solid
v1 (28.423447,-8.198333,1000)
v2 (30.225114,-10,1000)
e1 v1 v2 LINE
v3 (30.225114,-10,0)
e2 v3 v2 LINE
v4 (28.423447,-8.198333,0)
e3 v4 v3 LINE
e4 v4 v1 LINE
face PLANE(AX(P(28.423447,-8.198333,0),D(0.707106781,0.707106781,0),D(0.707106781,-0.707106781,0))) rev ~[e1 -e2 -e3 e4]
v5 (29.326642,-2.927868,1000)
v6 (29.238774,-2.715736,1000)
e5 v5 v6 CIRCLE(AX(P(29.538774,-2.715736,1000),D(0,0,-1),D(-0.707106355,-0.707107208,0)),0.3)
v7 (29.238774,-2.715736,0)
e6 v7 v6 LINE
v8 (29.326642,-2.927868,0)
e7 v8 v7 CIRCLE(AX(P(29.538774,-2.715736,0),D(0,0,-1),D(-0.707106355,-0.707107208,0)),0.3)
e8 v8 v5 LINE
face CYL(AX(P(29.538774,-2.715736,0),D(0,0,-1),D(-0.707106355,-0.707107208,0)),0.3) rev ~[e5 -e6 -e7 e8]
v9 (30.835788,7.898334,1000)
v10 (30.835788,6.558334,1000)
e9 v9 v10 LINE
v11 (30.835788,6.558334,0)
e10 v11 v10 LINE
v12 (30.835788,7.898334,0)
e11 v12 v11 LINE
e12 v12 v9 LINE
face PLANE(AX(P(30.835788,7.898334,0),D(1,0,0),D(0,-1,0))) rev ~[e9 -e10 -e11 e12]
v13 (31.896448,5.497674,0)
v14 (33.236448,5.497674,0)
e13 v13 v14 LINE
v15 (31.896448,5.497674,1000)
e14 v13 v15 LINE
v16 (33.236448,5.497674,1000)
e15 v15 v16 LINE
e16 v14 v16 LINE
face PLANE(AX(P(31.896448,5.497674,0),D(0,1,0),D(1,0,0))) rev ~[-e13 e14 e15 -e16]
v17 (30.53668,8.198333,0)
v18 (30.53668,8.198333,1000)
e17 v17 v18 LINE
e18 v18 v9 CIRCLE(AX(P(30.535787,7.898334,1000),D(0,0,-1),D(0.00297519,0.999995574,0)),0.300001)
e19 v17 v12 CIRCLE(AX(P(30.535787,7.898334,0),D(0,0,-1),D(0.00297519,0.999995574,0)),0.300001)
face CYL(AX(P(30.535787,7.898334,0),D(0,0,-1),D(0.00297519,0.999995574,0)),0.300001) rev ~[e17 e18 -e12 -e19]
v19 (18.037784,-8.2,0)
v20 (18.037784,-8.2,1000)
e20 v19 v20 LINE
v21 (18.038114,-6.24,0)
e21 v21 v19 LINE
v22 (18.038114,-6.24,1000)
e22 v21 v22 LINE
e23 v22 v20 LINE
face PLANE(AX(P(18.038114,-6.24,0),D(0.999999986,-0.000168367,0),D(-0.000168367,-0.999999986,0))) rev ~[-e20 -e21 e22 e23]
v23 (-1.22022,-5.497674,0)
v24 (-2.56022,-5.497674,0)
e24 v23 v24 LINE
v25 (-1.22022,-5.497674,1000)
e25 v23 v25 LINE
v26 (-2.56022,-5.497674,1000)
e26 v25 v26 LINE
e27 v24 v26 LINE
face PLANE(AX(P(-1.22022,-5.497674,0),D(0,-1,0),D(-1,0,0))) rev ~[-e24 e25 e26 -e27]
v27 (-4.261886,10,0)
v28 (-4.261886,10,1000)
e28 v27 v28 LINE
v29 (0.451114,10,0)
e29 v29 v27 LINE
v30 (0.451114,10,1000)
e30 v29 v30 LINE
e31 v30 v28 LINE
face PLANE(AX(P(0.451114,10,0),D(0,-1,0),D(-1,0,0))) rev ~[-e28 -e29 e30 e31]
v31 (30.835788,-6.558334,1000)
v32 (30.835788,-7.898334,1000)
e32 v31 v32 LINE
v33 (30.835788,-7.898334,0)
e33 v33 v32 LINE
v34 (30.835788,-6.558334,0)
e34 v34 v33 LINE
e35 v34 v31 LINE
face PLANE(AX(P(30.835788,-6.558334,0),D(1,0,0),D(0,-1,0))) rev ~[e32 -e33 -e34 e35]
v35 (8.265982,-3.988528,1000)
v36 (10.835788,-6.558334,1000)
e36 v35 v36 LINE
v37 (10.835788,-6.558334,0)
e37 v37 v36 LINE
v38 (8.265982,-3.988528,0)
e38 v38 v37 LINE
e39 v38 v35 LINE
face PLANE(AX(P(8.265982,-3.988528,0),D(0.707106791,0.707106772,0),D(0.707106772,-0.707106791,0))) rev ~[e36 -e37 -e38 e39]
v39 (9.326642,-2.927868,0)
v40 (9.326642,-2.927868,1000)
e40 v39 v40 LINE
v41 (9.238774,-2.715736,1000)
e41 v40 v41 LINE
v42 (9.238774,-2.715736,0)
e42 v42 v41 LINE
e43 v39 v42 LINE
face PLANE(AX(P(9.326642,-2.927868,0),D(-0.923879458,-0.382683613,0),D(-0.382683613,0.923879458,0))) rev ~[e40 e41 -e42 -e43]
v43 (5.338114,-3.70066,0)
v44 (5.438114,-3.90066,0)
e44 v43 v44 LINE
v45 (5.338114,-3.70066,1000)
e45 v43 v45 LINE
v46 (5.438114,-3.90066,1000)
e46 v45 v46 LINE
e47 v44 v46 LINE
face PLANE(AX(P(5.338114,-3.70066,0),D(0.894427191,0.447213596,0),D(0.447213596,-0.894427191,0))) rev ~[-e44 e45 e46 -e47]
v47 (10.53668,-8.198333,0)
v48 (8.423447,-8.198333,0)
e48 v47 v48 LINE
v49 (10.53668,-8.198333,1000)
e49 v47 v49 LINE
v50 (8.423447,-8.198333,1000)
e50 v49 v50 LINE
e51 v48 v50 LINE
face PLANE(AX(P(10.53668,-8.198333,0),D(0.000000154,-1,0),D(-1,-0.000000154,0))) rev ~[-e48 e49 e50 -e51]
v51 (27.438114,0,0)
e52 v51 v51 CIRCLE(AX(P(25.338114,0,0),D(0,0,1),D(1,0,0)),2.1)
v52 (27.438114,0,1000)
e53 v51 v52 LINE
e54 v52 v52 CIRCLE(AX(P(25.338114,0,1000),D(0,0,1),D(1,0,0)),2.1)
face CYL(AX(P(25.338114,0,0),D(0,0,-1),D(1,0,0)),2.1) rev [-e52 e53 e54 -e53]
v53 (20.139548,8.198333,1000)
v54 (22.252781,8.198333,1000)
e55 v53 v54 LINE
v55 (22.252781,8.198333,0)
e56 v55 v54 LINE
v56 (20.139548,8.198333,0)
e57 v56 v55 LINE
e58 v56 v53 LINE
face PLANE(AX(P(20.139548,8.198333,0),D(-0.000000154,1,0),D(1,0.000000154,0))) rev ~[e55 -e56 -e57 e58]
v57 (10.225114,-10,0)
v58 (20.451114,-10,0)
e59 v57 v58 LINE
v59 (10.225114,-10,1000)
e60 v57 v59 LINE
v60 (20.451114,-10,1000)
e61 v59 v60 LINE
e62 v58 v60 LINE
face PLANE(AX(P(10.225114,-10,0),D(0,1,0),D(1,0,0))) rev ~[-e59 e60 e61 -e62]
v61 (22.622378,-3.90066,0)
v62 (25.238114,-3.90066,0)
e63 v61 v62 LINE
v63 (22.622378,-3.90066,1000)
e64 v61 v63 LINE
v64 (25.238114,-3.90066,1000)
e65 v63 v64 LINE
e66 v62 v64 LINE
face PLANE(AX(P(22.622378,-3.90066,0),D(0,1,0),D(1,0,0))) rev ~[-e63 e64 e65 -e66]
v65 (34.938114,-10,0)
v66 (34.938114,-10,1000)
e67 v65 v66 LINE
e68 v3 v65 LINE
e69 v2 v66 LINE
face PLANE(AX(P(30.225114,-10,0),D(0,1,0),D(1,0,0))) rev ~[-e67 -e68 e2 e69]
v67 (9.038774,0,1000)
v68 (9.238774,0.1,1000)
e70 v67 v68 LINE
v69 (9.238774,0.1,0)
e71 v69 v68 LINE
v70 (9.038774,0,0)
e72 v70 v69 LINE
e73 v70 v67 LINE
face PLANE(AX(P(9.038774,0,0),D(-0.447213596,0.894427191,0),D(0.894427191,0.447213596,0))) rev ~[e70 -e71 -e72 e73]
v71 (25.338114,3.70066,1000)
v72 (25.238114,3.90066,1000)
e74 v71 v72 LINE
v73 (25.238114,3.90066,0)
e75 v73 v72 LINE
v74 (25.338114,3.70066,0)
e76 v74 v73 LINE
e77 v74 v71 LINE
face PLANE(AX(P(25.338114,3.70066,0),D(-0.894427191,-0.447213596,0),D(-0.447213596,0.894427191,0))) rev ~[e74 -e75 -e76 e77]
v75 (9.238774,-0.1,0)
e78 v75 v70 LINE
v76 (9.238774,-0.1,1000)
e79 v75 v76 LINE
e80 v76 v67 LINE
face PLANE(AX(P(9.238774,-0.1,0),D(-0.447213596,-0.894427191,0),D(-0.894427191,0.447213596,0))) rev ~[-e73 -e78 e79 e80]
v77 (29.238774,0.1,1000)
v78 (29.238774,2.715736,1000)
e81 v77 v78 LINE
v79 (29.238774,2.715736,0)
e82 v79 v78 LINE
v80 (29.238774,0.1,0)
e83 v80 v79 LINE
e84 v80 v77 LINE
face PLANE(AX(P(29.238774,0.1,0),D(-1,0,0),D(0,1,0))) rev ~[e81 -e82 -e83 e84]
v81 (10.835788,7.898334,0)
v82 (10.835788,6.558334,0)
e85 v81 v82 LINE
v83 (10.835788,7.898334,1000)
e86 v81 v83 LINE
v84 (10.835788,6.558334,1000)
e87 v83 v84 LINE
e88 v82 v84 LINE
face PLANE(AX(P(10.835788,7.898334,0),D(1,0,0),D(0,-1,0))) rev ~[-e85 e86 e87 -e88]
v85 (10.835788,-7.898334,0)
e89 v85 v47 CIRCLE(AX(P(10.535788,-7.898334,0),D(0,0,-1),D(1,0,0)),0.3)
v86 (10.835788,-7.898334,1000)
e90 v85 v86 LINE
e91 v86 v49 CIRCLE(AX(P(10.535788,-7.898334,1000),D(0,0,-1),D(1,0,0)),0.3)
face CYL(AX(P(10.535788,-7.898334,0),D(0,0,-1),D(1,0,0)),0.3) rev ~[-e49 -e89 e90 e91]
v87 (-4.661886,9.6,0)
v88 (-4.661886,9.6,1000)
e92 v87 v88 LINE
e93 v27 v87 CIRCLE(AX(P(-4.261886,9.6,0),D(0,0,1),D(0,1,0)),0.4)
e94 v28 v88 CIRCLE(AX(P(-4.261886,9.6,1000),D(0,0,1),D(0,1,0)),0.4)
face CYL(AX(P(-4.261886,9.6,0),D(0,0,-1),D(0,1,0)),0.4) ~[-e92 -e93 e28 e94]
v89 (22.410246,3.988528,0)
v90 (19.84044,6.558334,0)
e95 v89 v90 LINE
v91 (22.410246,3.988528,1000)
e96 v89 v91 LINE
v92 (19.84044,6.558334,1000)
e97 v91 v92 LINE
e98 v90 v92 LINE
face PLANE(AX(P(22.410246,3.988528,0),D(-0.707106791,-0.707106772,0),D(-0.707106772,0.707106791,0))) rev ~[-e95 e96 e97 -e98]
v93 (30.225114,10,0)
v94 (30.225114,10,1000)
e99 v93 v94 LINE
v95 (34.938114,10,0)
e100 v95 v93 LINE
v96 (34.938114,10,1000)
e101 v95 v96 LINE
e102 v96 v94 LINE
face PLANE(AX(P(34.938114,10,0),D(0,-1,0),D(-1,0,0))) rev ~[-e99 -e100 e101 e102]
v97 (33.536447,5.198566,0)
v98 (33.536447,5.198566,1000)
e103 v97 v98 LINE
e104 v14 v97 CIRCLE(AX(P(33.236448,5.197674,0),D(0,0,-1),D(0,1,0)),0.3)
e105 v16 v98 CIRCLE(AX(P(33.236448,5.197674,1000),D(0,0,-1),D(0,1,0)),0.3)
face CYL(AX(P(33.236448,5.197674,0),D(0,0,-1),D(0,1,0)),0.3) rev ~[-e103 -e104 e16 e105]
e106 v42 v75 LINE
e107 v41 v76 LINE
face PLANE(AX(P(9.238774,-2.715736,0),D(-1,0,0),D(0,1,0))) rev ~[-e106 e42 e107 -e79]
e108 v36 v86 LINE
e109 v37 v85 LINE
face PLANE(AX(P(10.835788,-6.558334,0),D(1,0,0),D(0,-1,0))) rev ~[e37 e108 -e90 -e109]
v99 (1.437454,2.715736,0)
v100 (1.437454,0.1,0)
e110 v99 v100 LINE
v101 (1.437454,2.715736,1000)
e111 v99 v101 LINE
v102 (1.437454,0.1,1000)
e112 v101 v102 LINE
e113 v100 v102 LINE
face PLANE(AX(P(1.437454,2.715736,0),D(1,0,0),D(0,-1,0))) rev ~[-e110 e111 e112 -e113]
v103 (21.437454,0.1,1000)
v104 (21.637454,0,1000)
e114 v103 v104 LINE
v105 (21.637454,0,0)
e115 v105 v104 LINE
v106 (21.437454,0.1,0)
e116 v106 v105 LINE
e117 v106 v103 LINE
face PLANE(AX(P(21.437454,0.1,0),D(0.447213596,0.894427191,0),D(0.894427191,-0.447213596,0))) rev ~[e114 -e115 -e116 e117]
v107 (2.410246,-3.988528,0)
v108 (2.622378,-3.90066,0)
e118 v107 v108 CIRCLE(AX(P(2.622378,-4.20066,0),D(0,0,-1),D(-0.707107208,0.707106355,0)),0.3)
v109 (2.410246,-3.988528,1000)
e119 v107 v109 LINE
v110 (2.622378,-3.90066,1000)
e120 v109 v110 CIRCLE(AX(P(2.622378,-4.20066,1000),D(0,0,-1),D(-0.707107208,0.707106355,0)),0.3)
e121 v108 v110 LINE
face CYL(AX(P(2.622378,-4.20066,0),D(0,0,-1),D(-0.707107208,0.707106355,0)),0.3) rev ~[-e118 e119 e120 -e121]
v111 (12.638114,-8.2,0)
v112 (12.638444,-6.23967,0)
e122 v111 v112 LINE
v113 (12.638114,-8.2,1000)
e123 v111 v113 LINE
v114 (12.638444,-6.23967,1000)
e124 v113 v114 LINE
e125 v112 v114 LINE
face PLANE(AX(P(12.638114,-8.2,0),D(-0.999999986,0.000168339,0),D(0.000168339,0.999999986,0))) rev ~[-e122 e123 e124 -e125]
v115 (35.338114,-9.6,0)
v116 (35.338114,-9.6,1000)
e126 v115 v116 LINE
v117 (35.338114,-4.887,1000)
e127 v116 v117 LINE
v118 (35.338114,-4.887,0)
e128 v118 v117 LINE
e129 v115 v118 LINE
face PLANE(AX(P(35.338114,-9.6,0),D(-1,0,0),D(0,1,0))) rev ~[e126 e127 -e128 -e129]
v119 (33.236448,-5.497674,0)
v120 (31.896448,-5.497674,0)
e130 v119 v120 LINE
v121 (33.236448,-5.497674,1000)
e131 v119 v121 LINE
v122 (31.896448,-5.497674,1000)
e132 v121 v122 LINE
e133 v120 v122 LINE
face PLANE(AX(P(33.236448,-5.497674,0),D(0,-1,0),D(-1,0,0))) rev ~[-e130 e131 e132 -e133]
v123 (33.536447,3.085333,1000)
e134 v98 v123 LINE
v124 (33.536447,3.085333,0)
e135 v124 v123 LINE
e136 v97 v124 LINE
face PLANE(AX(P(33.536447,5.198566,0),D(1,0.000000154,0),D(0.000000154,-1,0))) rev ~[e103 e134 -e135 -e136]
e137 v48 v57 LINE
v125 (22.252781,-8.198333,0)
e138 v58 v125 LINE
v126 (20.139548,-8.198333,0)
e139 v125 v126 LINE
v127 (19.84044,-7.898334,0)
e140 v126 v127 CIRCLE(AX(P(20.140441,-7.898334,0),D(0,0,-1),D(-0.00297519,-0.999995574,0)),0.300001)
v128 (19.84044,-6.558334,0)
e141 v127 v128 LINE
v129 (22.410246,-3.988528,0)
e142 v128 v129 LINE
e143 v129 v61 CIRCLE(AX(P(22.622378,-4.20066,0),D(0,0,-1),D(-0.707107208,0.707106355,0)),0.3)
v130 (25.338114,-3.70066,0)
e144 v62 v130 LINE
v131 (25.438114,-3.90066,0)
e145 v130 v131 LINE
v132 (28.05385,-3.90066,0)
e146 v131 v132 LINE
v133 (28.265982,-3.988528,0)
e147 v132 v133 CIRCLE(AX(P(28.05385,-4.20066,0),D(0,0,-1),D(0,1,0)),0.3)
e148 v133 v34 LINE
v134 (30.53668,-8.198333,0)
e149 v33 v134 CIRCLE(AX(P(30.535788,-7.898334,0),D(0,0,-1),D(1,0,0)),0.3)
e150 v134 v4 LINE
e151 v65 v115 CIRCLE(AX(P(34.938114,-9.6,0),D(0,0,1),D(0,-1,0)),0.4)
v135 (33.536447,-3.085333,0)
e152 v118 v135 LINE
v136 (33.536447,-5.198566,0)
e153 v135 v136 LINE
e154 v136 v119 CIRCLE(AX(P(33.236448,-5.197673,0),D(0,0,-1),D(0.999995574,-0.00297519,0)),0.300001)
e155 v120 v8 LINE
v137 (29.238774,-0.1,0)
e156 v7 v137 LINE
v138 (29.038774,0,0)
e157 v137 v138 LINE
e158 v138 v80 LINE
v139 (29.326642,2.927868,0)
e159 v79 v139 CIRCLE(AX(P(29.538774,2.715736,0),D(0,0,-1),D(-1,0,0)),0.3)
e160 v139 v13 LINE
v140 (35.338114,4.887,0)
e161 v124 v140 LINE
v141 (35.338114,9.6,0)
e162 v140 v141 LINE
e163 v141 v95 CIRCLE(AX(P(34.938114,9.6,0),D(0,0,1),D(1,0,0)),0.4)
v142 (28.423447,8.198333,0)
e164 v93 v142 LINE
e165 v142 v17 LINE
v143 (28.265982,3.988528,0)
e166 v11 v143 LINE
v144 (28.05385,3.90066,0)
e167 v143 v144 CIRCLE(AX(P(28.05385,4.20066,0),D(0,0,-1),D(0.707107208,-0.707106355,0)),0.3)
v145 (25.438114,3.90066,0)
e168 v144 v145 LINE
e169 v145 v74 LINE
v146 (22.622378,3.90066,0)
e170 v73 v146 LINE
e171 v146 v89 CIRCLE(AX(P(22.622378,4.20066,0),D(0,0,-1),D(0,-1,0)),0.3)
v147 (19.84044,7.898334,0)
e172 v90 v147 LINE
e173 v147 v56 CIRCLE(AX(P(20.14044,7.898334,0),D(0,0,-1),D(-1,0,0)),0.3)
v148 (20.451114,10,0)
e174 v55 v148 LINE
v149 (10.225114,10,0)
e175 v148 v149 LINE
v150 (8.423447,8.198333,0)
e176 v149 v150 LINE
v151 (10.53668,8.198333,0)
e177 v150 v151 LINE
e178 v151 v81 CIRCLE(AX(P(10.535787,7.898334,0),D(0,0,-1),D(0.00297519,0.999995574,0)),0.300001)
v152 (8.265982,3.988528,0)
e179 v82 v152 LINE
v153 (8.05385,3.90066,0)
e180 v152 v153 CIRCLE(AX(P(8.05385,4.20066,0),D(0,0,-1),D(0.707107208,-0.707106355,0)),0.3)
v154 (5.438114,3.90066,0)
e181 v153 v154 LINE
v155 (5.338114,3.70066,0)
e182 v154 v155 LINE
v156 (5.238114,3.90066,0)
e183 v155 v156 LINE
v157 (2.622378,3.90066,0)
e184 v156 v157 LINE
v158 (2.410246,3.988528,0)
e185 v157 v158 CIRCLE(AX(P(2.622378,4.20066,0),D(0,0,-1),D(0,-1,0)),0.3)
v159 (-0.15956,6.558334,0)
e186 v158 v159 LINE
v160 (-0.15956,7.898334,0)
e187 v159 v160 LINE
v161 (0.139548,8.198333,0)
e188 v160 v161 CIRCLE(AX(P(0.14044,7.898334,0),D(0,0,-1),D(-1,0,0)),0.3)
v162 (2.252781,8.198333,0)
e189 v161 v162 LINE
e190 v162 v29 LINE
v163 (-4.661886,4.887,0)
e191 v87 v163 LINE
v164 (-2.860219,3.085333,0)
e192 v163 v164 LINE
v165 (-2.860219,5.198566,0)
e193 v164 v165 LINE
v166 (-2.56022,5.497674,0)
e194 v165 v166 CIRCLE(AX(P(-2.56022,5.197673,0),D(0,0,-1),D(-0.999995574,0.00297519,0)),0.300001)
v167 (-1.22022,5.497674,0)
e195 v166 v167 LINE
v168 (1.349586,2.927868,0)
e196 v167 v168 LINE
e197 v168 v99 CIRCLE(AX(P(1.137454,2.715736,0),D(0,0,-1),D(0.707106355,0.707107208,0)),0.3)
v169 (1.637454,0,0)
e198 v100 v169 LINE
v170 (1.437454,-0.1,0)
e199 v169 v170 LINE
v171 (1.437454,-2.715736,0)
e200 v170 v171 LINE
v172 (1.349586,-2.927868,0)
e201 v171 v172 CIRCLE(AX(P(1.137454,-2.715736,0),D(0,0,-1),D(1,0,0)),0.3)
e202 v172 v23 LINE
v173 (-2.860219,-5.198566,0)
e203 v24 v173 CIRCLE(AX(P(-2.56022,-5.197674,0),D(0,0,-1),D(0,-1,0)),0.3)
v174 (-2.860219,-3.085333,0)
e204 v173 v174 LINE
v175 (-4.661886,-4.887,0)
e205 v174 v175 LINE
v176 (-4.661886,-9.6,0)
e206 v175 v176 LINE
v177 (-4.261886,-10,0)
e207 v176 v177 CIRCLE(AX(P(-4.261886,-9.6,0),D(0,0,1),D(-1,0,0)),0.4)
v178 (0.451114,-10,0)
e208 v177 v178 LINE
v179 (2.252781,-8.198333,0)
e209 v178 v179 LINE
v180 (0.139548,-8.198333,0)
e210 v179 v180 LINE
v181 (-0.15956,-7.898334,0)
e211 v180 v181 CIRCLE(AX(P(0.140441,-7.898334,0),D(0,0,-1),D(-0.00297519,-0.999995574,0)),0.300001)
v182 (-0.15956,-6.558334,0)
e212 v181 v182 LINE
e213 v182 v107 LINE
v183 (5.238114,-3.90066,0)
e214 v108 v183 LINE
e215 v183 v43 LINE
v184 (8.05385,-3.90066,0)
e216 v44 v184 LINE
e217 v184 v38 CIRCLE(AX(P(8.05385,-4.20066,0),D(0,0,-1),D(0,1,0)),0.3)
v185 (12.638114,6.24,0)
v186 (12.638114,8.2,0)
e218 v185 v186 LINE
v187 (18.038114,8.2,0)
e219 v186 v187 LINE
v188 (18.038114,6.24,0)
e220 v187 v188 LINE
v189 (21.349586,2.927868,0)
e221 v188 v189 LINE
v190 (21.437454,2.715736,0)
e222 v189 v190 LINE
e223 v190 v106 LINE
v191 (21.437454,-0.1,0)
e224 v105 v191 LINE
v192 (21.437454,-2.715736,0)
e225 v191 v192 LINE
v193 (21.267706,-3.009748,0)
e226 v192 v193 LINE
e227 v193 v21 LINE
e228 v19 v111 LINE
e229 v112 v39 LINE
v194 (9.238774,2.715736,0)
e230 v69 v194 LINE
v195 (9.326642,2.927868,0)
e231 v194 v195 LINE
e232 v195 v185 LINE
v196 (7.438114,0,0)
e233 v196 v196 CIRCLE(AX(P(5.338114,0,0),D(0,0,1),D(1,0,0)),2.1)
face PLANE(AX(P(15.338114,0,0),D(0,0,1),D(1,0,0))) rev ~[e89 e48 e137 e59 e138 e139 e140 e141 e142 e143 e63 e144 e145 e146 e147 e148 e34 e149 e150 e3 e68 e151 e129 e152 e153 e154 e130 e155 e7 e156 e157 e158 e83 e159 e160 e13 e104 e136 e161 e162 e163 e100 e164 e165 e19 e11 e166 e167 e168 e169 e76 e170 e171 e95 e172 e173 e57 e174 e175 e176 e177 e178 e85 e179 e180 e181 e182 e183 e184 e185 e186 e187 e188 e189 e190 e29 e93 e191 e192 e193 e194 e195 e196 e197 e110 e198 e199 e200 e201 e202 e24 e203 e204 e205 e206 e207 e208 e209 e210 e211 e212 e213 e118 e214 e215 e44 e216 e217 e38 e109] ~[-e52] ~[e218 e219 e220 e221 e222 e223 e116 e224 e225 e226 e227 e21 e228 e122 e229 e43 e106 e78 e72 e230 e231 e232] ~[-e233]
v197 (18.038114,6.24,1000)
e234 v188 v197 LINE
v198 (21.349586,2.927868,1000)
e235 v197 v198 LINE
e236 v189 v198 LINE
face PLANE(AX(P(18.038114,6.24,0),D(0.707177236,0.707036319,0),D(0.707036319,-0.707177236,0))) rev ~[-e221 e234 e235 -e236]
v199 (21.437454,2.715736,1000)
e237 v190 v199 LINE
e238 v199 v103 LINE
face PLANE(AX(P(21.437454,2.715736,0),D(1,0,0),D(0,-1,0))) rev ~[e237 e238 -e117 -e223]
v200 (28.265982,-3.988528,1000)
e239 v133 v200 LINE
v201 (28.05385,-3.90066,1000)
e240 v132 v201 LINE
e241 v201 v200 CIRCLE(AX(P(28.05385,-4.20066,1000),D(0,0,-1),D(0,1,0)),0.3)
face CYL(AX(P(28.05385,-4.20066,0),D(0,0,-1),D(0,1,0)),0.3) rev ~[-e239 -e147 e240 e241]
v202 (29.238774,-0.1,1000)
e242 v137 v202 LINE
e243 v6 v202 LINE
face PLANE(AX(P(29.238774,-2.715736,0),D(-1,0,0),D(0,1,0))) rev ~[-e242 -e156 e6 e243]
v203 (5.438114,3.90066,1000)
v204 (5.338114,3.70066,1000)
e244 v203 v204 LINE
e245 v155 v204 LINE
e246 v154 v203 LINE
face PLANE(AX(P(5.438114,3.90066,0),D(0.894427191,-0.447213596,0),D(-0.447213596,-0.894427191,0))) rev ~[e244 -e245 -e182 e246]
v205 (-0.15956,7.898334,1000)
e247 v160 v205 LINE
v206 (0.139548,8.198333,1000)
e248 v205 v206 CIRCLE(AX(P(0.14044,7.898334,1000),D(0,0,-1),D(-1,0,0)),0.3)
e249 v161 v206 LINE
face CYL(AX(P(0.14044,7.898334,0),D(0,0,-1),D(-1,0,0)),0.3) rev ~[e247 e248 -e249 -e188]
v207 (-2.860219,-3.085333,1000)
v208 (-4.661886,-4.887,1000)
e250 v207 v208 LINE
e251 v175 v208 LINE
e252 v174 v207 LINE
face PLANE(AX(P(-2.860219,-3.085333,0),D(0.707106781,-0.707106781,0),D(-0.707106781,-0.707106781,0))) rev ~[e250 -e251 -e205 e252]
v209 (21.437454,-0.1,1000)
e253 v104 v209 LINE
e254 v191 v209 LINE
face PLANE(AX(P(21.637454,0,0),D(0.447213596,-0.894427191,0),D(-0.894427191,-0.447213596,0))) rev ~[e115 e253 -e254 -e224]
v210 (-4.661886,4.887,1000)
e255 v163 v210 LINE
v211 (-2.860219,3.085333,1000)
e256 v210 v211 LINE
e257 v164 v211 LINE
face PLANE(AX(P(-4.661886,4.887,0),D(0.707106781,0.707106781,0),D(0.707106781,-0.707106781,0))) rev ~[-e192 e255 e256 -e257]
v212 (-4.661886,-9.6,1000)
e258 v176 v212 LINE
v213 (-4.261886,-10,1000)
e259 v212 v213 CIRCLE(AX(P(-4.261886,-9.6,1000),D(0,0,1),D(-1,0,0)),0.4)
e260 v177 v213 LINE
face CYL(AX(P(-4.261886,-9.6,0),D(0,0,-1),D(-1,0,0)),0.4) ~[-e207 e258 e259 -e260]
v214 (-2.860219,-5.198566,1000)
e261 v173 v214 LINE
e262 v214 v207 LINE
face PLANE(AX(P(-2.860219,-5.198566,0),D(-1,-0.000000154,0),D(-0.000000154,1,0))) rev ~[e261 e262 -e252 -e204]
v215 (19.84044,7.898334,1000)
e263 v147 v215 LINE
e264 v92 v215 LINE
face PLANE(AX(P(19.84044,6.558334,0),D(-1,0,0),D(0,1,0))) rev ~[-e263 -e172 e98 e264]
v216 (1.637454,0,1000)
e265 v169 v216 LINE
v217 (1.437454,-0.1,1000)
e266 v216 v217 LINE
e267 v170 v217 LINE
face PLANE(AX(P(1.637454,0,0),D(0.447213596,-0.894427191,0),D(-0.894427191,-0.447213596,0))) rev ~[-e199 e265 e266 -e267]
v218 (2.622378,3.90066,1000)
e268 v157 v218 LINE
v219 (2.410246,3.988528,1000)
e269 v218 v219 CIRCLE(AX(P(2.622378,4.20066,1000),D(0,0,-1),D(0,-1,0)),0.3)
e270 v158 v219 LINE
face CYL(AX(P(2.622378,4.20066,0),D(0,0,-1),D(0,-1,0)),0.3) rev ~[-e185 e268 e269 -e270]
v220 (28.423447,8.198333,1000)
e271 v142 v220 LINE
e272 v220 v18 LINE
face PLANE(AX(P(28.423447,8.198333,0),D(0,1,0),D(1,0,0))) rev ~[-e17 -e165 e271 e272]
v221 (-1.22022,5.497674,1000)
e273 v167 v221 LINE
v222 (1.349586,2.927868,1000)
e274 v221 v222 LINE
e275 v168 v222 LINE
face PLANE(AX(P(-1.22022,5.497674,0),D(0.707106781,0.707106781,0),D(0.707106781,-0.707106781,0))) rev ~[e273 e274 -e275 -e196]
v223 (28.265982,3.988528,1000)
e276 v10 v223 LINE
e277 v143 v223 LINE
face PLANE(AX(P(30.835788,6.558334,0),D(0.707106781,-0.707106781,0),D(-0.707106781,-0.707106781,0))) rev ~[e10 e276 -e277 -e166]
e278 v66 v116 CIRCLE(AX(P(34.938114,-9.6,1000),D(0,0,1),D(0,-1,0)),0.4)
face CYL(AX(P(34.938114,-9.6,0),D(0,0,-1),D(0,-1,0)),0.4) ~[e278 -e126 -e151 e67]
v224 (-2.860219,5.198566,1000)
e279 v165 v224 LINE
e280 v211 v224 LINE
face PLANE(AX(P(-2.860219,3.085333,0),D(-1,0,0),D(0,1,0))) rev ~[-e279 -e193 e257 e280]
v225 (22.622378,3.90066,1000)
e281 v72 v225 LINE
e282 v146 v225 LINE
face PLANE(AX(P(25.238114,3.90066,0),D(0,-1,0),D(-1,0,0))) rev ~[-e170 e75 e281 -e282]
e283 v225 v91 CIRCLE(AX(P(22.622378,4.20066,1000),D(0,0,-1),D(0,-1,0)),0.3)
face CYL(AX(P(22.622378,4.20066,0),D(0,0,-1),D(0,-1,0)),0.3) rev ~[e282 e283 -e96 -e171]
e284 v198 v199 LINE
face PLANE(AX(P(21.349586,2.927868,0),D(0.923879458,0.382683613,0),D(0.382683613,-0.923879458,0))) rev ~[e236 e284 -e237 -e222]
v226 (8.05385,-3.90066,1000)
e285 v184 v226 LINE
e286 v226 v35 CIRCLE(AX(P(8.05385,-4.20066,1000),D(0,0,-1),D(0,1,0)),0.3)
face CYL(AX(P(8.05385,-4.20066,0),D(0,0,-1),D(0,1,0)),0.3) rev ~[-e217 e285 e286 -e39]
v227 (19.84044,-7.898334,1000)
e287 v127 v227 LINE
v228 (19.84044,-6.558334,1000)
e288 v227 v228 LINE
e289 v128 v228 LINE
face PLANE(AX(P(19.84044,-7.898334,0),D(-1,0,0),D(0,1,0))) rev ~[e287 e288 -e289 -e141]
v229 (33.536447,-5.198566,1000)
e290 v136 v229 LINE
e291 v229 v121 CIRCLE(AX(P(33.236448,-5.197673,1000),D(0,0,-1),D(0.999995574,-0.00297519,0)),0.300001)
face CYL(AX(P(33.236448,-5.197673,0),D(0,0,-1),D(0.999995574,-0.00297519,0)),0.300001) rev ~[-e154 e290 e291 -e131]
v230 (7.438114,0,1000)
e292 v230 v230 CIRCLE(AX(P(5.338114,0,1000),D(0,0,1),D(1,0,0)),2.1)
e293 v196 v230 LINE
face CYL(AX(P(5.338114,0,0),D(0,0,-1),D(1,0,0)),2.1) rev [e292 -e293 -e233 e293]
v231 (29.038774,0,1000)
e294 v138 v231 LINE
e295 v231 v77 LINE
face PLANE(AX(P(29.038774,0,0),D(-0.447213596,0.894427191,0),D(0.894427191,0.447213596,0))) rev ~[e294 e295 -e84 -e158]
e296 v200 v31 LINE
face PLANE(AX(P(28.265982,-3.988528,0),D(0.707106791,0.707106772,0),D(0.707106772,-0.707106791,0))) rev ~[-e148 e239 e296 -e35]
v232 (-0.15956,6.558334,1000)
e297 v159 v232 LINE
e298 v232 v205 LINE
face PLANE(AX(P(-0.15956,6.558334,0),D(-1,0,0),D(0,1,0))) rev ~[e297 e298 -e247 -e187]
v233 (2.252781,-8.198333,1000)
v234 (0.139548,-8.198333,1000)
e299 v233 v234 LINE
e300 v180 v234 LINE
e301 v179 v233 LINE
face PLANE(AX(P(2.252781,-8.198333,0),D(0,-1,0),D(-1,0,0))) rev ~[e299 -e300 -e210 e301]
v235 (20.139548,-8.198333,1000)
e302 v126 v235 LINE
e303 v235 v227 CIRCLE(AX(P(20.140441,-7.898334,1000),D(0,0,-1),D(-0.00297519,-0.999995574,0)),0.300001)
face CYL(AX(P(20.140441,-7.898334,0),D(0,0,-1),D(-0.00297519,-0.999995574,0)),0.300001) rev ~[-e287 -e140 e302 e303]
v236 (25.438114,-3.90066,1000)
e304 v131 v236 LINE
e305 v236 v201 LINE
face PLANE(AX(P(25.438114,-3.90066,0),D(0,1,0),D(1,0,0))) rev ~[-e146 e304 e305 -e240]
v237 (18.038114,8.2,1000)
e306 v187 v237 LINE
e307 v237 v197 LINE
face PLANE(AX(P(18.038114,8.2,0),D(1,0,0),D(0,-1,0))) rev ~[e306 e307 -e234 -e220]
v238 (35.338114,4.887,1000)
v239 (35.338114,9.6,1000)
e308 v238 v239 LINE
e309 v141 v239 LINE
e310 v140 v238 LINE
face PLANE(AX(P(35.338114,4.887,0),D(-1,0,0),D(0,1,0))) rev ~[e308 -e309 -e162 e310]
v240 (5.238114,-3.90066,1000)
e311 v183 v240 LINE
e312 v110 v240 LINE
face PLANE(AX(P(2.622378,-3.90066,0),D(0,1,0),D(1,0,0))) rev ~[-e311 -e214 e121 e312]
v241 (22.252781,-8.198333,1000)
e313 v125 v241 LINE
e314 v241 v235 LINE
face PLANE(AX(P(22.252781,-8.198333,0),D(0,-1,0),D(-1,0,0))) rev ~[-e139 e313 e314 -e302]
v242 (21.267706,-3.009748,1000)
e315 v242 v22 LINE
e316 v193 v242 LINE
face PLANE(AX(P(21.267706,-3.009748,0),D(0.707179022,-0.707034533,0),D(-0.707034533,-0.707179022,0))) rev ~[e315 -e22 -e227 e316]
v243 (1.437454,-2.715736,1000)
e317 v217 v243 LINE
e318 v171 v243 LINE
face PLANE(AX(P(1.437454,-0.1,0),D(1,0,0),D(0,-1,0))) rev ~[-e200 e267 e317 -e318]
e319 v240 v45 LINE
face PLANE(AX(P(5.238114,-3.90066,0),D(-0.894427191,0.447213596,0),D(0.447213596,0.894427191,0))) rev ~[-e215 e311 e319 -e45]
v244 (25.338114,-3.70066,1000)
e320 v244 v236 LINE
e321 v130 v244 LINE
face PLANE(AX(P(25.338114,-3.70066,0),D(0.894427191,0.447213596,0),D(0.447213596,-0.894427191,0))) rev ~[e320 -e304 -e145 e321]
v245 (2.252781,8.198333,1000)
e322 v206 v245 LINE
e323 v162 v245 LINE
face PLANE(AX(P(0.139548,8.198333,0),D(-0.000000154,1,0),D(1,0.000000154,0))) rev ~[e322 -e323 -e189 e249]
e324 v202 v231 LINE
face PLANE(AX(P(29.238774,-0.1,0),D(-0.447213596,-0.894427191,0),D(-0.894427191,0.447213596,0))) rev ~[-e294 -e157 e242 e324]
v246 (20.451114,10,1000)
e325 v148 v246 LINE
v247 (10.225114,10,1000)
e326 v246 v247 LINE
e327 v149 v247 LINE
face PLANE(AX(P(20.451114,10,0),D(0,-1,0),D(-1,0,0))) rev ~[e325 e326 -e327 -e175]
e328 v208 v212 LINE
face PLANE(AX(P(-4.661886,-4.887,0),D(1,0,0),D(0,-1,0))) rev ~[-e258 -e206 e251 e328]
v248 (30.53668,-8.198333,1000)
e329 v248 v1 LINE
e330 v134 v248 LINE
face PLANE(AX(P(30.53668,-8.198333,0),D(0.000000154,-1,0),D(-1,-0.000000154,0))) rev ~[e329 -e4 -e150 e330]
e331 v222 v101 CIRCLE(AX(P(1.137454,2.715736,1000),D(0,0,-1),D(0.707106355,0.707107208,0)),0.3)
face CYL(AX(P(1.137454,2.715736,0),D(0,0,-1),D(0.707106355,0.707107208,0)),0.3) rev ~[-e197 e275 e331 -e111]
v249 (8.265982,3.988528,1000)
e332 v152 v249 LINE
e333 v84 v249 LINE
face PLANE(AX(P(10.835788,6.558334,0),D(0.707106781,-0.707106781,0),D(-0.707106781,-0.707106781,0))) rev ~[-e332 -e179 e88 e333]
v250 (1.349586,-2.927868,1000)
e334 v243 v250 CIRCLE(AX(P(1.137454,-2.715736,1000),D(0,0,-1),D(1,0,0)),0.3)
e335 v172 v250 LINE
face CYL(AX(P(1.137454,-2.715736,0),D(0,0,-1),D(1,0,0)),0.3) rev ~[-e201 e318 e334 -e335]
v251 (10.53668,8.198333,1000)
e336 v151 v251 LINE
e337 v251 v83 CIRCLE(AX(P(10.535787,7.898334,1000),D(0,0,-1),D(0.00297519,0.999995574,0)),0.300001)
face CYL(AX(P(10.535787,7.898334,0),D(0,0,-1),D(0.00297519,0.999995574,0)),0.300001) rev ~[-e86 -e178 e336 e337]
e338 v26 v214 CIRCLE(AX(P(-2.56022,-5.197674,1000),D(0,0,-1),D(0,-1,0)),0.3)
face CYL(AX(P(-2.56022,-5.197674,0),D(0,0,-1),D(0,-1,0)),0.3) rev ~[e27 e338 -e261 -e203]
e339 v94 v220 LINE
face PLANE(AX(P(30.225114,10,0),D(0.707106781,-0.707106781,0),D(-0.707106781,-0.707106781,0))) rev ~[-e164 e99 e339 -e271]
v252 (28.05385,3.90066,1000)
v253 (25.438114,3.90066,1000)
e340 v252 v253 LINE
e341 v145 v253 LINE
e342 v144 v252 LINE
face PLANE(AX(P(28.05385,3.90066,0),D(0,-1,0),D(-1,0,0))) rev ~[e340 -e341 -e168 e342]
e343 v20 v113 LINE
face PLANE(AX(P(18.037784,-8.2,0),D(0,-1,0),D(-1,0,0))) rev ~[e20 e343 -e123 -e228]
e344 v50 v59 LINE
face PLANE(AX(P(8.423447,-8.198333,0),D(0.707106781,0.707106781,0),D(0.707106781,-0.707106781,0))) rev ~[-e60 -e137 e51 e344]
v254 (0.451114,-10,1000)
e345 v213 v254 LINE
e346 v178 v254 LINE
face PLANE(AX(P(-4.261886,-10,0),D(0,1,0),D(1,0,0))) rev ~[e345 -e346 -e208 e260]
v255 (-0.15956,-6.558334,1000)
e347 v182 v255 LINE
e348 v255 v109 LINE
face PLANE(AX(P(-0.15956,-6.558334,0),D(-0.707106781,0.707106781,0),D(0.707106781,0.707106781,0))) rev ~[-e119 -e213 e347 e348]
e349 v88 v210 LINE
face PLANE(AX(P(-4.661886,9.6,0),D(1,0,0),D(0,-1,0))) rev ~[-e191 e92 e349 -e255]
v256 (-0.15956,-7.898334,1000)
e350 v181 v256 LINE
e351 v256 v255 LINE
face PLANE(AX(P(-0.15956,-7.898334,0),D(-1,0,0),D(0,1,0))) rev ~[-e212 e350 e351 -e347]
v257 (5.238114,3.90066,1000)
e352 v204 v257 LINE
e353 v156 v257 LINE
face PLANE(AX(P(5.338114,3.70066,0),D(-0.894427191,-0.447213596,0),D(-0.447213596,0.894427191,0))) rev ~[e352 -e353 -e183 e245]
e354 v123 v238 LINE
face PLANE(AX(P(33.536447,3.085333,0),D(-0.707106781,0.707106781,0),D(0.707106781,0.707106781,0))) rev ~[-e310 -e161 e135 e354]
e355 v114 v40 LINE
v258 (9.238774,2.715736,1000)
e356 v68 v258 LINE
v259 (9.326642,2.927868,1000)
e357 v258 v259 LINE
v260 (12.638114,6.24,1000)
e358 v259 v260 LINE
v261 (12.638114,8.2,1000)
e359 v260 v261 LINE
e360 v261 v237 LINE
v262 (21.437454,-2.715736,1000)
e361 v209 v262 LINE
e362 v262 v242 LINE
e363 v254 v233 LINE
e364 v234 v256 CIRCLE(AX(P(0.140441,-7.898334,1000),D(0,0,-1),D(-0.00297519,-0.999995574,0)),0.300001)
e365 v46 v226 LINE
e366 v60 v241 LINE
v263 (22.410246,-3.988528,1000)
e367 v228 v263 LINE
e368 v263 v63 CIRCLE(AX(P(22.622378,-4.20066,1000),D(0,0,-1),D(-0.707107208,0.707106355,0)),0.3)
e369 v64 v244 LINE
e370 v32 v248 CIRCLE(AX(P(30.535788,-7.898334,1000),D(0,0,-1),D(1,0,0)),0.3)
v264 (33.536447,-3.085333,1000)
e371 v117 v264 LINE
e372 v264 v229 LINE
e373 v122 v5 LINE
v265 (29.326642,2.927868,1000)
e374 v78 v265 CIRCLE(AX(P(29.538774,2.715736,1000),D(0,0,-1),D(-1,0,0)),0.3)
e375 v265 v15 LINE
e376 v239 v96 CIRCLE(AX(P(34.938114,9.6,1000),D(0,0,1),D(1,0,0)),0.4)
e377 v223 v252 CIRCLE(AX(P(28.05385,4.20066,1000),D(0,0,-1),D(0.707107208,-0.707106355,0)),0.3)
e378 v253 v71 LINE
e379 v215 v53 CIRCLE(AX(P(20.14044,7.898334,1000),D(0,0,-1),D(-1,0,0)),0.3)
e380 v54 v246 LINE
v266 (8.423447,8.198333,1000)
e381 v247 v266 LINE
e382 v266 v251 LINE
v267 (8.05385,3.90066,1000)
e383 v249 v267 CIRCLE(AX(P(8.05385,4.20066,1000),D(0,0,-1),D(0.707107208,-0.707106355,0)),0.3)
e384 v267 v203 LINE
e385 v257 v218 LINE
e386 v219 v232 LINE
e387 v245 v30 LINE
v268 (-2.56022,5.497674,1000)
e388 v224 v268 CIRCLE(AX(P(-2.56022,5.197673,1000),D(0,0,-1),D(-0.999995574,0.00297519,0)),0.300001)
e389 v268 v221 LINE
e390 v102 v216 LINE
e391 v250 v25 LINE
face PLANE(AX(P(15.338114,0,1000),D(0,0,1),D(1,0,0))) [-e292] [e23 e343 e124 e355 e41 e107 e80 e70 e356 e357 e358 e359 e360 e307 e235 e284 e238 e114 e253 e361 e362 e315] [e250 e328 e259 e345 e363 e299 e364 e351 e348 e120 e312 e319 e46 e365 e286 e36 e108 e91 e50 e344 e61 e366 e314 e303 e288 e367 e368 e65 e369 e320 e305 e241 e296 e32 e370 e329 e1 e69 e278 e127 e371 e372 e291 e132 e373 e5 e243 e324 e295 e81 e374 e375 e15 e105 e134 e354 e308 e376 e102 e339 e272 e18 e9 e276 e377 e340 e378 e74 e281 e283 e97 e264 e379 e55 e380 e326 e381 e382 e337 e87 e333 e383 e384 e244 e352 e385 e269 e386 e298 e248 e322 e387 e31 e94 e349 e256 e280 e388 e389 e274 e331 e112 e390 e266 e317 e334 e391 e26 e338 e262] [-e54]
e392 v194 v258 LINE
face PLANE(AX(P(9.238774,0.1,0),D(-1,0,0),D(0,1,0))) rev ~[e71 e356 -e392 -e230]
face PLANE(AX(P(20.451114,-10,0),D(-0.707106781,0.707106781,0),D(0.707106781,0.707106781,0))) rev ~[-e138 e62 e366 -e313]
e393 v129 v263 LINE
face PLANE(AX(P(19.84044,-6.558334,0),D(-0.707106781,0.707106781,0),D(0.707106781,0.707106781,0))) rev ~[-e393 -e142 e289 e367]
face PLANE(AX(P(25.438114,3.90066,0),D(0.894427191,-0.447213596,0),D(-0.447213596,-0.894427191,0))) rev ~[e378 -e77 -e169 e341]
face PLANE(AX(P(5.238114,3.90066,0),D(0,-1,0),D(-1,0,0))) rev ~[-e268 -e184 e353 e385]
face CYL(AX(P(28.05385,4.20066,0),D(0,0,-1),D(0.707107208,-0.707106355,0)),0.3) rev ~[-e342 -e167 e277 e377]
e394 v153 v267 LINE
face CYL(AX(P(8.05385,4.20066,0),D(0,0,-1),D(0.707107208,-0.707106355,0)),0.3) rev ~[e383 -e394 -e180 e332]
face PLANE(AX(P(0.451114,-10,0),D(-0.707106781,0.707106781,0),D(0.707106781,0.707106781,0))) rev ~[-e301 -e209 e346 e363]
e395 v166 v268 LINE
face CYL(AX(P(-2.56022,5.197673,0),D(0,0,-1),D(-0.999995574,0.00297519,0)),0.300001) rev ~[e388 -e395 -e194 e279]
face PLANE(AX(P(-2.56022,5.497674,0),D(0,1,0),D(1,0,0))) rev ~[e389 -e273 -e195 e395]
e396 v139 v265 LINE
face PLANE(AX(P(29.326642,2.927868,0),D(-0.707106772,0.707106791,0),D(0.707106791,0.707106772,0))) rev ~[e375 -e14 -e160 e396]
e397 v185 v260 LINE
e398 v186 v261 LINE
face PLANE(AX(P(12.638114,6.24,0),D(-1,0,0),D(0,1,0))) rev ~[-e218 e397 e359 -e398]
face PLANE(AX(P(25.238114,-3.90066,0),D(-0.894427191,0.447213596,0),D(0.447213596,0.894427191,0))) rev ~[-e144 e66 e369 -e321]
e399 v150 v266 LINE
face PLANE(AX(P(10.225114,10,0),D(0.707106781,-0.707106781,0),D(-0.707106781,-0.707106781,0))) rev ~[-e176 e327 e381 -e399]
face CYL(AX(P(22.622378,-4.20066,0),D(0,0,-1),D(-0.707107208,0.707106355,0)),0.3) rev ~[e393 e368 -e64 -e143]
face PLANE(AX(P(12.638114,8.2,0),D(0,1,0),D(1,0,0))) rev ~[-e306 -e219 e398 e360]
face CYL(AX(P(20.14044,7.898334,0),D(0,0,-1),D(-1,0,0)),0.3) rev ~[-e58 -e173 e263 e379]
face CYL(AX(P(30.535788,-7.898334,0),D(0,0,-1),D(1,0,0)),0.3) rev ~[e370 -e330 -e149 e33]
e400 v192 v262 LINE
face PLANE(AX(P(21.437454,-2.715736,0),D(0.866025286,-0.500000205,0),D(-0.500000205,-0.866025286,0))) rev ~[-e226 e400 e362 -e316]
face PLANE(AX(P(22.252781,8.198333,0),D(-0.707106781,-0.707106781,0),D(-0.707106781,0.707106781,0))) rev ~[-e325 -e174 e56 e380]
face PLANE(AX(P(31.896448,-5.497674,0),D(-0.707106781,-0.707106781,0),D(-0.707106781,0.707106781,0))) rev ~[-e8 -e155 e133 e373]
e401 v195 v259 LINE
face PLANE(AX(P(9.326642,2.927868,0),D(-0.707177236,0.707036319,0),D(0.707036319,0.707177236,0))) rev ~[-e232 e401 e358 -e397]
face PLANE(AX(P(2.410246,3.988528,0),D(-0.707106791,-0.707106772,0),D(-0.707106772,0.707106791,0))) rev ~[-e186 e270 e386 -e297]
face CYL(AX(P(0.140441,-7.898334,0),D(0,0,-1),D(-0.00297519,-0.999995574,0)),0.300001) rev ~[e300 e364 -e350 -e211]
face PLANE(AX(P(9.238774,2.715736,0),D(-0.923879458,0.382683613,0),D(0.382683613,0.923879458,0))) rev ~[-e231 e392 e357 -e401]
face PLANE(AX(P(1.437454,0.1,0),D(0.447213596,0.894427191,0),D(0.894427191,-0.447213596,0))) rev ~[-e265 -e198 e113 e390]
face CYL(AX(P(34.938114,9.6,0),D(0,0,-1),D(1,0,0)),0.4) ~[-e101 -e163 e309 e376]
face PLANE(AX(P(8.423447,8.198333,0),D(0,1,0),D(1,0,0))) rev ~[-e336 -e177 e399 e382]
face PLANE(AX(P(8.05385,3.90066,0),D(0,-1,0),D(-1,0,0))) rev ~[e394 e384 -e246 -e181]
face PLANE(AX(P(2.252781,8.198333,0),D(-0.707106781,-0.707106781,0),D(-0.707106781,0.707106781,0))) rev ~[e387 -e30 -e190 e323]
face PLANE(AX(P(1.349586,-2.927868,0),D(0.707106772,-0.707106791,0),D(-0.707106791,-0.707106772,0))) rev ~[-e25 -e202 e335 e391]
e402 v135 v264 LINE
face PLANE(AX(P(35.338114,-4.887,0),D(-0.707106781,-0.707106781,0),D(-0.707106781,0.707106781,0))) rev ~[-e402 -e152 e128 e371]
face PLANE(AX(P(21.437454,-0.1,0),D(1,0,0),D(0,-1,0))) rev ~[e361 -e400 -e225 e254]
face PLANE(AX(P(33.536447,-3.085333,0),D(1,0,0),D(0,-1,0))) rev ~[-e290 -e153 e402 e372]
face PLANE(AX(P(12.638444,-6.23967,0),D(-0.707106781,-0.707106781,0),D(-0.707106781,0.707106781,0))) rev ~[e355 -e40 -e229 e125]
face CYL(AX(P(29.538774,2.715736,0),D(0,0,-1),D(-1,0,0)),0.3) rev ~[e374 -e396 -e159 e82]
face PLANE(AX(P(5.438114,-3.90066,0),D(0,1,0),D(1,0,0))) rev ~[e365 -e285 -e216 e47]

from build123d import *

# Parameters (mm, degrees)
F0_R     = 2.1
F1_DEPTH = 1000


# Not quite as in the source:
# - ends of sketch curves that miss each other by under 0.0002 mm in the source are joined


with BuildPart() as f1:
    # F0 (on Top) → F1 (new body)
    with BuildSketch(Plane.XY):
        with BuildLine():
            Line((-2.860219, 3.085333), (-2.860219, 5.198566))
            ThreePointArc((-2.860219, 5.198566), (-2.7720364303, 5.4101211696), (-2.56022, 5.497674))
            Line((-2.56022, 5.497674), (-1.22022, 5.497674))
            Line((-1.22022, 5.497674), (1.349586, 2.927868))
            ThreePointArc((1.349586, 2.927868), (1.4146178598, 2.8305410297), (1.437454, 2.715736))
            Line((1.437454, 2.715736), (1.437454, 0.1))
            Line((1.437454, 0.1), (1.637454, 0))
            Line((1.637454, 0), (1.437454, -0.1))
            Line((1.437454, -0.1), (1.437454, -2.715736))
            ThreePointArc((1.437454, -2.715736), (1.4146178598, -2.8305410297), (1.3495860344, -2.9278680344))
            Line((1.3495860344, -2.9278680344), (-1.22022, -5.497674))
            Line((-1.22022, -5.497674), (-2.56022, -5.497674))
            ThreePointArc((-2.56022, -5.497674), (-2.7720364303, -5.4101211696), (-2.8602186739, -5.198565999))
            Line((-2.8602186739, -5.198565999), (-2.860219, -3.085333))
            Line((-2.860219, -3.085333), (-4.661886, -4.887))
            Line((-4.661886, -4.887), (-4.661886, -9.6))
            ThreePointArc((-4.661886, -9.6), (-4.5447287125, -9.8828427125), (-4.261886, -10))
            Line((-4.261886, -10), (0.451114, -10))
            Line((0.451114, -10), (2.252781, -8.198333))
            Line((2.252781, -8.198333), (0.139548, -8.198333))
            ThreePointArc((0.139548, -8.198333), (-0.0720071696, -8.1101504303), (-0.15956, -7.898334))
            Line((-0.15956, -7.898334), (-0.15956, -6.558334))
            Line((-0.15956, -6.558334), (2.410246, -3.988528))
            ThreePointArc((2.410246, -3.988528), (2.5075729703, -3.9234961402), (2.622378, -3.90066))
            Line((2.622378, -3.90066), (5.238114, -3.90066))
            Line((5.238114, -3.90066), (5.338114, -3.70066))
            Line((5.338114, -3.70066), (5.438114, -3.90066))
            Line((5.438114, -3.90066), (8.05385, -3.90066))
            ThreePointArc((8.05385, -3.90066), (8.1686550297, -3.9234961402), (8.2659820344, -3.9885279656))
            Line((8.2659820344, -3.9885279656), (10.835788, -6.558334))
            Line((10.835788, -6.558334), (10.835788, -7.898334))
            ThreePointArc((10.835788, -7.898334), (10.7482351696, -8.1101504303), (10.536679999, -8.1983326739))
            Line((10.536679999, -8.1983326739), (8.423447, -8.198333))
            Line((8.423447, -8.198333), (10.225114, -10))
            Line((10.225114, -10), (20.451114, -10))
            Line((20.451114, -10), (22.252781, -8.198333))
            Line((22.252781, -8.198333), (20.139548, -8.198333))
            ThreePointArc((20.139548, -8.198333), (19.9279928304, -8.1101504303), (19.84044, -7.898334))
            Line((19.84044, -7.898334), (19.84044, -6.558334))
            Line((19.84044, -6.558334), (22.410246, -3.988528))
            ThreePointArc((22.410246, -3.988528), (22.5075729703, -3.9234961402), (22.622378, -3.90066))
            Line((22.622378, -3.90066), (25.238114, -3.90066))
            Line((25.238114, -3.90066), (25.338114, -3.70066))
            Line((25.338114, -3.70066), (25.438114, -3.90066))
            Line((25.438114, -3.90066), (28.05385, -3.90066))
            ThreePointArc((28.05385, -3.90066), (28.1686550297, -3.9234961402), (28.2659820344, -3.9885279656))
            Line((28.2659820344, -3.9885279656), (30.835788, -6.558334))
            Line((30.835788, -6.558334), (30.835788, -7.898334))
            ThreePointArc((30.835788, -7.898334), (30.7482351696, -8.1101504303), (30.536679999, -8.1983326739))
            Line((30.536679999, -8.1983326739), (28.423447, -8.198333))
            Line((28.423447, -8.198333), (30.225114, -10))
            Line((30.225114, -10), (34.938114, -10))
            ThreePointArc((34.938114, -10), (35.2209567125, -9.8828427125), (35.338114, -9.6))
            Line((35.338114, -9.6), (35.338114, -4.887))
            Line((35.338114, -4.887), (33.536447, -3.085333))
            Line((33.536447, -3.085333), (33.536447, -5.198566))
            ThreePointArc((33.536447, -5.198566), (33.4482644303, -5.4101211696), (33.236448, -5.497674))
            Line((33.236448, -5.497674), (31.896448, -5.497674))
            Line((31.896448, -5.497674), (29.326642, -2.927868))
            ThreePointArc((29.326642, -2.927868), (29.2616101402, -2.8305410297), (29.238774, -2.715736))
            Line((29.238774, -2.715736), (29.238774, -0.1))
            Line((29.238774, -0.1), (29.038774, 0))
            Line((29.038774, 0), (29.238774, 0.1))
            Line((29.238774, 0.1), (29.238774, 2.715736))
            ThreePointArc((29.238774, 2.715736), (29.2616101402, 2.8305410297), (29.3266419656, 2.9278680344))
            Line((29.3266419656, 2.9278680344), (31.896448, 5.497674))
            Line((31.896448, 5.497674), (33.236448, 5.497674))
            ThreePointArc((33.236448, 5.497674), (33.4482644303, 5.4101211696), (33.5364466739, 5.198565999))
            Line((33.5364466739, 5.198565999), (33.536447, 3.085333))
            Line((33.536447, 3.085333), (35.338114, 4.887))
            Line((35.338114, 4.887), (35.338114, 9.6))
            ThreePointArc((35.338114, 9.6), (35.2209567125, 9.8828427125), (34.938114, 10))
            Line((34.938114, 10), (30.225114, 10))
            Line((30.225114, 10), (28.423447, 8.198333))
            Line((28.423447, 8.198333), (30.53668, 8.198333))
            ThreePointArc((30.53668, 8.198333), (30.7482351696, 8.1101504303), (30.835788, 7.898334))
            Line((30.835788, 7.898334), (30.835788, 6.558334))
            Line((30.835788, 6.558334), (28.265982, 3.988528))
            ThreePointArc((28.265982, 3.988528), (28.1686550297, 3.9234961402), (28.05385, 3.90066))
            Line((28.05385, 3.90066), (25.438114, 3.90066))
            Line((25.438114, 3.90066), (25.338114, 3.70066))
            Line((25.338114, 3.70066), (25.238114, 3.90066))
            Line((25.238114, 3.90066), (22.622378, 3.90066))
            ThreePointArc((22.622378, 3.90066), (22.5075729703, 3.9234961402), (22.4102459656, 3.9885279656))
            Line((22.4102459656, 3.9885279656), (19.84044, 6.558334))
            Line((19.84044, 6.558334), (19.84044, 7.898334))
            ThreePointArc((19.84044, 7.898334), (19.9279928304, 8.1101504303), (20.139548001, 8.1983326739))
            Line((20.139548001, 8.1983326739), (22.252781, 8.198333))
            Line((22.252781, 8.198333), (20.451114, 10))
            Line((20.451114, 10), (10.225114, 10))
            Line((10.225114, 10), (8.423447, 8.198333))
            Line((8.423447, 8.198333), (10.53668, 8.198333))
            ThreePointArc((10.53668, 8.198333), (10.7482351696, 8.1101504303), (10.835788, 7.898334))
            Line((10.835788, 7.898334), (10.835788, 6.558334))
            Line((10.835788, 6.558334), (8.265982, 3.988528))
            ThreePointArc((8.265982, 3.988528), (8.1686550297, 3.9234961402), (8.05385, 3.90066))
            Line((8.05385, 3.90066), (5.438114, 3.90066))
            Line((5.438114, 3.90066), (5.338114, 3.70066))
            Line((5.338114, 3.70066), (5.238114, 3.90066))
            Line((5.238114, 3.90066), (2.622378, 3.90066))
            ThreePointArc((2.622378, 3.90066), (2.5075729703, 3.9234961402), (2.4102459656, 3.9885279656))
            Line((2.4102459656, 3.9885279656), (-0.15956, 6.558334))
            Line((-0.15956, 6.558334), (-0.15956, 7.898334))
            ThreePointArc((-0.15956, 7.898334), (-0.0720071696, 8.1101504303), (0.139548001, 8.1983326739))
            Line((0.139548001, 8.1983326739), (2.252781, 8.198333))
            Line((2.252781, 8.198333), (0.451114, 10))
            Line((0.451114, 10), (-4.261886, 10))
            ThreePointArc((-4.261886, 10), (-4.5447287125, 9.8828427125), (-4.661886, 9.6))
            Line((-4.661886, 9.6), (-4.661886, 4.887))
            Line((-4.661886, 4.887), (-2.860219, 3.085333))
        make_face()
        with Locations((5.338114, 0)):
            Circle(F0_R, mode=Mode.SUBTRACT)
        Polygon((12.638114, 6.24), (12.638114, 8.2), (18.038114, 8.2), (18.038114, 6.24), (21.349586, 2.927868), (21.437454, 2.715736), (21.437454, 0.1), (21.637454, 0), (21.437454, -0.1), (21.437454, -2.715736), (21.267706, -3.009748), (18.038114, -6.24), (18.037784, -8.2), (12.638114, -8.2), (12.638444, -6.23967), (9.326642, -2.927868), (9.238774, -2.715736), (9.238774, -0.1), (9.038774, 0), (9.238774, 0.1), (9.238774, 2.715736), (9.326642, 2.927868), align=None, mode=Mode.SUBTRACT)
        with Locations((25.338114, 0)):
            Circle(F0_R, mode=Mode.SUBTRACT)
    extrude(amount=F1_DEPTH)


solid = f1.part
